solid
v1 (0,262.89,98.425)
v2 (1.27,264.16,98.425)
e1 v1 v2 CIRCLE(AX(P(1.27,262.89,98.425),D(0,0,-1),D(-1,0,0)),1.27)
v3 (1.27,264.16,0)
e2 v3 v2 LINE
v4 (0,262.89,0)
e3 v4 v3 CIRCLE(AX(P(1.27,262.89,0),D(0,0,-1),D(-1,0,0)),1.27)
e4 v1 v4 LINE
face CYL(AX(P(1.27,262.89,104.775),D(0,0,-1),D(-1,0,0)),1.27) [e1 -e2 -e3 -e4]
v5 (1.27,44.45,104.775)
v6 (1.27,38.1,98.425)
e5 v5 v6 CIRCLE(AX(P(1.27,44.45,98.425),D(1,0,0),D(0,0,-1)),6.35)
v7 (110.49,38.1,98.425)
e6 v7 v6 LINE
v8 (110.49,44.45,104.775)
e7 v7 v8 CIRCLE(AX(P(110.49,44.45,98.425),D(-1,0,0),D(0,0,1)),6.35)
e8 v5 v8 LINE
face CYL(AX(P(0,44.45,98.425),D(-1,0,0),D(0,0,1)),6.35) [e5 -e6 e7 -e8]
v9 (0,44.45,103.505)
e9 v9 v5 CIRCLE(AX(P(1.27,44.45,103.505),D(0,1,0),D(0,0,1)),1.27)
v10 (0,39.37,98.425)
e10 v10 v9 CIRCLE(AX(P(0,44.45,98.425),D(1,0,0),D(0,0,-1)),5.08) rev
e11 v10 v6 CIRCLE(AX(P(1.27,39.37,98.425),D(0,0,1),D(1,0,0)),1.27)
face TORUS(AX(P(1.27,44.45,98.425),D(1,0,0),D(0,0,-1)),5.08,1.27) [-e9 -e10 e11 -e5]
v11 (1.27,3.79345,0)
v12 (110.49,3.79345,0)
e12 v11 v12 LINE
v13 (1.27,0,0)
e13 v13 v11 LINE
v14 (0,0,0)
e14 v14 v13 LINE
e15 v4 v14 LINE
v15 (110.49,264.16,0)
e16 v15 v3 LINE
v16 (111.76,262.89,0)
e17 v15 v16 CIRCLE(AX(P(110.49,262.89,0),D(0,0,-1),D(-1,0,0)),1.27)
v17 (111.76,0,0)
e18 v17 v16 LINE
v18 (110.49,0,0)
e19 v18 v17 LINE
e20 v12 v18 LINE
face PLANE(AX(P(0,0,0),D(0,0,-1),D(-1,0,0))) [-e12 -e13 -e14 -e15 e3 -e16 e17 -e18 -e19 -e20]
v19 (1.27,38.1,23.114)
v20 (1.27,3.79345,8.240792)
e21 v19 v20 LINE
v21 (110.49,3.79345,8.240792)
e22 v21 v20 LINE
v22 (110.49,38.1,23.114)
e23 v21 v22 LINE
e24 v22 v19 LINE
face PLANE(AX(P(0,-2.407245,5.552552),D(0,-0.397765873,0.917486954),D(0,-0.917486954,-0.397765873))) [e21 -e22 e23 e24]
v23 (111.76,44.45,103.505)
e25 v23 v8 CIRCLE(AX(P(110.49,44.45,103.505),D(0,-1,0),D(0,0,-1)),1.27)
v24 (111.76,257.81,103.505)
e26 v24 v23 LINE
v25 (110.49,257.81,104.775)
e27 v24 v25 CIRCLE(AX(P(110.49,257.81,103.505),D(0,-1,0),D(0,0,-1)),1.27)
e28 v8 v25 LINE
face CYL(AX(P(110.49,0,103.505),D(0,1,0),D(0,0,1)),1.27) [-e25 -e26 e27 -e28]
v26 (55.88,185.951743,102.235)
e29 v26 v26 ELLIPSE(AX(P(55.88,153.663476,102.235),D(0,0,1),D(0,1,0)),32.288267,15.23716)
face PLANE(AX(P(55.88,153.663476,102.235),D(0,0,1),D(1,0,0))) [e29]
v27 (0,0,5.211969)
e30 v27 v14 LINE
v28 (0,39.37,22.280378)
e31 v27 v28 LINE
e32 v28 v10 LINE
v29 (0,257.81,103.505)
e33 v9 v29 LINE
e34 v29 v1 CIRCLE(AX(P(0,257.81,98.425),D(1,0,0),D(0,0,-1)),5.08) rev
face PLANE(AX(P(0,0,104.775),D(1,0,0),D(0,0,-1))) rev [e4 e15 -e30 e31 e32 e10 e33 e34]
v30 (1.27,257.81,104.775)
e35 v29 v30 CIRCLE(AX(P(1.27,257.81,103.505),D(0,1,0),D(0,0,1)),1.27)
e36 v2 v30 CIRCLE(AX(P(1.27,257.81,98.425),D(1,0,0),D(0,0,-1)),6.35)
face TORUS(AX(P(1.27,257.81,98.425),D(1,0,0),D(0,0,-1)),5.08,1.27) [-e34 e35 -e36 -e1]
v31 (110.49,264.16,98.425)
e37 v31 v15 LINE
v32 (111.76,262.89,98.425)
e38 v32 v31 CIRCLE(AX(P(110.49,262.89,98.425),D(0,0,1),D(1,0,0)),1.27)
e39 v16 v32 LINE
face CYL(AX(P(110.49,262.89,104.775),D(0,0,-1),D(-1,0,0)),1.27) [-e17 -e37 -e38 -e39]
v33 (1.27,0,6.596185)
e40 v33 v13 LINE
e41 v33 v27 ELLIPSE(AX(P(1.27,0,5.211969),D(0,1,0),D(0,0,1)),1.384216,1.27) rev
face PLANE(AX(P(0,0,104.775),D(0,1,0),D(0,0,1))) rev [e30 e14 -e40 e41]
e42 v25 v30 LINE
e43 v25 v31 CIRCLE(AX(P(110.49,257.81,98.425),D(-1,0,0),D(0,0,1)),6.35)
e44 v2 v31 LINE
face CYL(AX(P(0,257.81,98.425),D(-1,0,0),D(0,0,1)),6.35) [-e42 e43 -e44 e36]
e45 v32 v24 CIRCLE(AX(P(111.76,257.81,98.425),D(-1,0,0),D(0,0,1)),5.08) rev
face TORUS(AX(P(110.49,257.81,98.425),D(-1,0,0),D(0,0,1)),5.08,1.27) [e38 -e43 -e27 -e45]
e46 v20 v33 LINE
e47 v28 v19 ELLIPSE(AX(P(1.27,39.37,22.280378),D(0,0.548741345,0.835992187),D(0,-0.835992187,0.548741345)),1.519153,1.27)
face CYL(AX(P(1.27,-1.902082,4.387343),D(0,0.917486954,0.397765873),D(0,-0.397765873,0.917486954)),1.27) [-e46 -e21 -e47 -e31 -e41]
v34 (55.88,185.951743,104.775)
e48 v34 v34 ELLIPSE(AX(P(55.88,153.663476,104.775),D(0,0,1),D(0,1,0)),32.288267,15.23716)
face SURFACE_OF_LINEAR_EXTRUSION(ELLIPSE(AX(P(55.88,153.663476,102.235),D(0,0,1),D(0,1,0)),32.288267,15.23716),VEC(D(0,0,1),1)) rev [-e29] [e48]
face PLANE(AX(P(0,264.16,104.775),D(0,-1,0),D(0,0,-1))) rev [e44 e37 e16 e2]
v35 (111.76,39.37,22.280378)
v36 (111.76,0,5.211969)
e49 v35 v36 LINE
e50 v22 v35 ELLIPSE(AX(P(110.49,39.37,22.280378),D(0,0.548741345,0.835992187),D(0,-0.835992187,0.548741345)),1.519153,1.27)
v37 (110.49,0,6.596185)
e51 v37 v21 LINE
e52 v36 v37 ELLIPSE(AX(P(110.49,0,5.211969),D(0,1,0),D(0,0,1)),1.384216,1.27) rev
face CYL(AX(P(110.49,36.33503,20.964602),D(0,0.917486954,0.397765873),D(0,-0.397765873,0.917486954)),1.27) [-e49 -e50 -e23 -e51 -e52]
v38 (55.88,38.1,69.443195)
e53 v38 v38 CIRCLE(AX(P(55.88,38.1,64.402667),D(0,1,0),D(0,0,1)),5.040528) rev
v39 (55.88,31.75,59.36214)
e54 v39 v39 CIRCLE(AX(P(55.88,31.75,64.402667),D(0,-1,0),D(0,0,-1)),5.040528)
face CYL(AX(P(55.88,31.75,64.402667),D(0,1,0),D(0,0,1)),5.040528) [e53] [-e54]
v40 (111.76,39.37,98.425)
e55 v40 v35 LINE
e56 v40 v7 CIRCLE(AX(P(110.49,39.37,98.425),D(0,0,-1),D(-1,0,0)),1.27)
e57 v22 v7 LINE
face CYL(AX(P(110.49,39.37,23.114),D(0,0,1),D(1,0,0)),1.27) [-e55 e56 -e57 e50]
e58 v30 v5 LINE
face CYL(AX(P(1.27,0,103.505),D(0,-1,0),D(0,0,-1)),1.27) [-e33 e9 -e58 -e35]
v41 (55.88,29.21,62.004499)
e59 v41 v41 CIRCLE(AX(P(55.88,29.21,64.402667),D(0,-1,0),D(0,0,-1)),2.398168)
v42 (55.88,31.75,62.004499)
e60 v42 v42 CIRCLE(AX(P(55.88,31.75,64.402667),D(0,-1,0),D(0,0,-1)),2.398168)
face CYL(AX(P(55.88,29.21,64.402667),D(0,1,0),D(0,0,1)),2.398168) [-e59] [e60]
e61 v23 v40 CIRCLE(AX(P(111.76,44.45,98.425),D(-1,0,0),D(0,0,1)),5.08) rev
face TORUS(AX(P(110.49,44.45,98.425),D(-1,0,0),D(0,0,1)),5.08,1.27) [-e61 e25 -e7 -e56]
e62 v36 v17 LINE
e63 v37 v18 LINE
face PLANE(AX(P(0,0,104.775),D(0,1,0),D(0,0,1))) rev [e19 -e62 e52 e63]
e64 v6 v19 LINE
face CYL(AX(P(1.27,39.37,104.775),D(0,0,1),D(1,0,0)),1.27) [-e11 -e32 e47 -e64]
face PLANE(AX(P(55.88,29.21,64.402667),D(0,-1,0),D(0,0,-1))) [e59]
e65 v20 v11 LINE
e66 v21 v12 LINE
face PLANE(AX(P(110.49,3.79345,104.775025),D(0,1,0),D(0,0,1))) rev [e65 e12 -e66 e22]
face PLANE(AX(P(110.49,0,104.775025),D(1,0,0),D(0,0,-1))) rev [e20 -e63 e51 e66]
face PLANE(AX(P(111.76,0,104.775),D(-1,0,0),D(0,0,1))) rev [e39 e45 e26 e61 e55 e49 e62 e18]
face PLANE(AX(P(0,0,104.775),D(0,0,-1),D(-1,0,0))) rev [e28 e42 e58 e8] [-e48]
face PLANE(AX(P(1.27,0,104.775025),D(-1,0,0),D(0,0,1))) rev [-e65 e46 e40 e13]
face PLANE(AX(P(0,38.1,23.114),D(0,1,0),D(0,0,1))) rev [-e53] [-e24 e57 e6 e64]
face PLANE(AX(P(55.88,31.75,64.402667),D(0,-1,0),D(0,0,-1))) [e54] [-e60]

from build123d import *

# Parameters (mm, degrees)
SKETCH1_W           = 111.76
SKETCH1_H           = 264.16
BOSS_EXTRUDE1_DEPTH = 104.77499999999999
SKETCH2_W           = 111.76
SKETCH2_H           = 38.1
CUT_EXTRUDE1_DEPTH  = 81.66099999999999
CUT_LOFT3_START     = -22
CUT_LOFT3_OUTLINE_W = 111.76
CUT_LOFT3_OUTLINE_H = 41.526476030000005
CUT_LOFT3_DEPTH     = 15.94808629
SKETCH7_W           = 109.22000000000003
SKETCH7_H           = 3.7934503700089675
CUT_EXTRUDE3_DEPTH  = 306.36634363498547
SKETCH8_RX          = 32.28826667150602
SKETCH8_RY          = 15.237159552845547
CUT_EXTRUDE4_DEPTH  = 2.54
SKETCH9_R           = 5.040527571520393
BOSS_EXTRUDE2_DEPTH = 6.35
SKETCH10_R          = 2.398168465987588
BOSS_EXTRUDE3_DEPTH = 2.54
FILLET1_R           = 6.35
FILLET2_R           = 1.27


with BuildPart() as part:
    # Sketch1 → Boss-Extrude1 (new body)
    with BuildSketch(Plane.XY):
        with Locations((55.88, 132.08)):
            Rectangle(SKETCH1_W, SKETCH1_H)
    extrude(amount=BOSS_EXTRUDE1_DEPTH)

    # Sketch2 → Cut-Extrude1 (cut)
    with BuildSketch(Plane.XY.offset(104.77499999999999)):
        with Locations((55.88, 19.05)):
            Rectangle(SKETCH2_W, SKETCH2_H)
    extrude(amount=-CUT_EXTRUDE1_DEPTH, mode=Mode.SUBTRACT)

    # Cut-Loft3: read off the stored shape, not the designer's step
    # Cut-Loft3 outline → Cut-Loft3 (cut)
    with BuildSketch(Plane(origin=(0, 0, 0), x_dir=(1, 0, 0), z_dir=(0, 0.3977658725333551, -0.9174869539387353)).offset(CUT_LOFT3_START)):
        with Locations((55.88, -23.386975308)):
            Rectangle(CUT_LOFT3_OUTLINE_W, CUT_LOFT3_OUTLINE_H)
    extrude(amount=CUT_LOFT3_DEPTH, mode=Mode.SUBTRACT)

    # Sketch7 → Cut-Extrude3 (cut, through all)
    with BuildSketch(Plane(origin=(0, 0, 0), x_dir=(-1, 0, 0), z_dir=(0, 0, -1))):
        with Locations((-55.88000000000001, 1.8967251850044837)):
            Rectangle(SKETCH7_W, SKETCH7_H)
    extrude(amount=-CUT_EXTRUDE3_DEPTH, mode=Mode.SUBTRACT)

    # Sketch8 → Cut-Extrude4 (cut)
    with BuildSketch(Plane.XY.offset(104.77499999999999)):
        with Locations(Location((55.88, 153.6634760331982), (0, 0, 90))):
            Ellipse(SKETCH8_RX, SKETCH8_RY)
    extrude(amount=-CUT_EXTRUDE4_DEPTH, mode=Mode.SUBTRACT)

    # Sketch9 → Boss-Extrude2 (add)
    with BuildSketch(Plane.XZ.offset(-38.1)):
        with Locations(Location((55.88, 64.40266714831378, 0), (0, 0, 90))):
            Circle(SKETCH9_R)
    extrude(amount=BOSS_EXTRUDE2_DEPTH)

    # Sketch10 → Boss-Extrude3 (add)
    with BuildSketch(Plane.XZ.offset(-31.75)):
        with Locations(Location((55.88, 64.40266714831378, 0), (0, 0, 270))):
            Circle(SKETCH10_R)
    extrude(amount=BOSS_EXTRUDE3_DEPTH)

    # Fillet1
    fillet1_edges = [part.edges().sort_by_distance(p)[0] for p in [
        (55.88, 264.16, 104.77499999999999),
        (55.88, 38.1, 104.77499999999999),
    ]]
    fillet(fillet1_edges, radius=FILLET1_R)

    # Fillet2
    fillet2_edges = [part.edges().sort_by_distance(p)[0] for p in [
        (0, 264.16, 49.2125),
        (0, 262.3001280605346, 102.91512806053457),
        (0, 38.1, 60.7695),
        (0, 39.959871939465415, 102.91512806053457),
        (111.76, 38.1, 60.7695),
        (111.76, 39.959871939465415, 102.91512806053457),
        (111.76, 264.16, 49.2125),
        (111.76, 262.3001280605346, 102.91512806053457),
        (0, 19.049999999822614, 14.855092514590622),
        (111.76, 19.04999999982261, 14.85509251459062),
        (0, 151.13, 104.77499999999999),
        (111.76, 151.13, 104.77499999999999),
    ]]
    fillet(fillet2_edges, radius=FILLET2_R)


solid = part.part
